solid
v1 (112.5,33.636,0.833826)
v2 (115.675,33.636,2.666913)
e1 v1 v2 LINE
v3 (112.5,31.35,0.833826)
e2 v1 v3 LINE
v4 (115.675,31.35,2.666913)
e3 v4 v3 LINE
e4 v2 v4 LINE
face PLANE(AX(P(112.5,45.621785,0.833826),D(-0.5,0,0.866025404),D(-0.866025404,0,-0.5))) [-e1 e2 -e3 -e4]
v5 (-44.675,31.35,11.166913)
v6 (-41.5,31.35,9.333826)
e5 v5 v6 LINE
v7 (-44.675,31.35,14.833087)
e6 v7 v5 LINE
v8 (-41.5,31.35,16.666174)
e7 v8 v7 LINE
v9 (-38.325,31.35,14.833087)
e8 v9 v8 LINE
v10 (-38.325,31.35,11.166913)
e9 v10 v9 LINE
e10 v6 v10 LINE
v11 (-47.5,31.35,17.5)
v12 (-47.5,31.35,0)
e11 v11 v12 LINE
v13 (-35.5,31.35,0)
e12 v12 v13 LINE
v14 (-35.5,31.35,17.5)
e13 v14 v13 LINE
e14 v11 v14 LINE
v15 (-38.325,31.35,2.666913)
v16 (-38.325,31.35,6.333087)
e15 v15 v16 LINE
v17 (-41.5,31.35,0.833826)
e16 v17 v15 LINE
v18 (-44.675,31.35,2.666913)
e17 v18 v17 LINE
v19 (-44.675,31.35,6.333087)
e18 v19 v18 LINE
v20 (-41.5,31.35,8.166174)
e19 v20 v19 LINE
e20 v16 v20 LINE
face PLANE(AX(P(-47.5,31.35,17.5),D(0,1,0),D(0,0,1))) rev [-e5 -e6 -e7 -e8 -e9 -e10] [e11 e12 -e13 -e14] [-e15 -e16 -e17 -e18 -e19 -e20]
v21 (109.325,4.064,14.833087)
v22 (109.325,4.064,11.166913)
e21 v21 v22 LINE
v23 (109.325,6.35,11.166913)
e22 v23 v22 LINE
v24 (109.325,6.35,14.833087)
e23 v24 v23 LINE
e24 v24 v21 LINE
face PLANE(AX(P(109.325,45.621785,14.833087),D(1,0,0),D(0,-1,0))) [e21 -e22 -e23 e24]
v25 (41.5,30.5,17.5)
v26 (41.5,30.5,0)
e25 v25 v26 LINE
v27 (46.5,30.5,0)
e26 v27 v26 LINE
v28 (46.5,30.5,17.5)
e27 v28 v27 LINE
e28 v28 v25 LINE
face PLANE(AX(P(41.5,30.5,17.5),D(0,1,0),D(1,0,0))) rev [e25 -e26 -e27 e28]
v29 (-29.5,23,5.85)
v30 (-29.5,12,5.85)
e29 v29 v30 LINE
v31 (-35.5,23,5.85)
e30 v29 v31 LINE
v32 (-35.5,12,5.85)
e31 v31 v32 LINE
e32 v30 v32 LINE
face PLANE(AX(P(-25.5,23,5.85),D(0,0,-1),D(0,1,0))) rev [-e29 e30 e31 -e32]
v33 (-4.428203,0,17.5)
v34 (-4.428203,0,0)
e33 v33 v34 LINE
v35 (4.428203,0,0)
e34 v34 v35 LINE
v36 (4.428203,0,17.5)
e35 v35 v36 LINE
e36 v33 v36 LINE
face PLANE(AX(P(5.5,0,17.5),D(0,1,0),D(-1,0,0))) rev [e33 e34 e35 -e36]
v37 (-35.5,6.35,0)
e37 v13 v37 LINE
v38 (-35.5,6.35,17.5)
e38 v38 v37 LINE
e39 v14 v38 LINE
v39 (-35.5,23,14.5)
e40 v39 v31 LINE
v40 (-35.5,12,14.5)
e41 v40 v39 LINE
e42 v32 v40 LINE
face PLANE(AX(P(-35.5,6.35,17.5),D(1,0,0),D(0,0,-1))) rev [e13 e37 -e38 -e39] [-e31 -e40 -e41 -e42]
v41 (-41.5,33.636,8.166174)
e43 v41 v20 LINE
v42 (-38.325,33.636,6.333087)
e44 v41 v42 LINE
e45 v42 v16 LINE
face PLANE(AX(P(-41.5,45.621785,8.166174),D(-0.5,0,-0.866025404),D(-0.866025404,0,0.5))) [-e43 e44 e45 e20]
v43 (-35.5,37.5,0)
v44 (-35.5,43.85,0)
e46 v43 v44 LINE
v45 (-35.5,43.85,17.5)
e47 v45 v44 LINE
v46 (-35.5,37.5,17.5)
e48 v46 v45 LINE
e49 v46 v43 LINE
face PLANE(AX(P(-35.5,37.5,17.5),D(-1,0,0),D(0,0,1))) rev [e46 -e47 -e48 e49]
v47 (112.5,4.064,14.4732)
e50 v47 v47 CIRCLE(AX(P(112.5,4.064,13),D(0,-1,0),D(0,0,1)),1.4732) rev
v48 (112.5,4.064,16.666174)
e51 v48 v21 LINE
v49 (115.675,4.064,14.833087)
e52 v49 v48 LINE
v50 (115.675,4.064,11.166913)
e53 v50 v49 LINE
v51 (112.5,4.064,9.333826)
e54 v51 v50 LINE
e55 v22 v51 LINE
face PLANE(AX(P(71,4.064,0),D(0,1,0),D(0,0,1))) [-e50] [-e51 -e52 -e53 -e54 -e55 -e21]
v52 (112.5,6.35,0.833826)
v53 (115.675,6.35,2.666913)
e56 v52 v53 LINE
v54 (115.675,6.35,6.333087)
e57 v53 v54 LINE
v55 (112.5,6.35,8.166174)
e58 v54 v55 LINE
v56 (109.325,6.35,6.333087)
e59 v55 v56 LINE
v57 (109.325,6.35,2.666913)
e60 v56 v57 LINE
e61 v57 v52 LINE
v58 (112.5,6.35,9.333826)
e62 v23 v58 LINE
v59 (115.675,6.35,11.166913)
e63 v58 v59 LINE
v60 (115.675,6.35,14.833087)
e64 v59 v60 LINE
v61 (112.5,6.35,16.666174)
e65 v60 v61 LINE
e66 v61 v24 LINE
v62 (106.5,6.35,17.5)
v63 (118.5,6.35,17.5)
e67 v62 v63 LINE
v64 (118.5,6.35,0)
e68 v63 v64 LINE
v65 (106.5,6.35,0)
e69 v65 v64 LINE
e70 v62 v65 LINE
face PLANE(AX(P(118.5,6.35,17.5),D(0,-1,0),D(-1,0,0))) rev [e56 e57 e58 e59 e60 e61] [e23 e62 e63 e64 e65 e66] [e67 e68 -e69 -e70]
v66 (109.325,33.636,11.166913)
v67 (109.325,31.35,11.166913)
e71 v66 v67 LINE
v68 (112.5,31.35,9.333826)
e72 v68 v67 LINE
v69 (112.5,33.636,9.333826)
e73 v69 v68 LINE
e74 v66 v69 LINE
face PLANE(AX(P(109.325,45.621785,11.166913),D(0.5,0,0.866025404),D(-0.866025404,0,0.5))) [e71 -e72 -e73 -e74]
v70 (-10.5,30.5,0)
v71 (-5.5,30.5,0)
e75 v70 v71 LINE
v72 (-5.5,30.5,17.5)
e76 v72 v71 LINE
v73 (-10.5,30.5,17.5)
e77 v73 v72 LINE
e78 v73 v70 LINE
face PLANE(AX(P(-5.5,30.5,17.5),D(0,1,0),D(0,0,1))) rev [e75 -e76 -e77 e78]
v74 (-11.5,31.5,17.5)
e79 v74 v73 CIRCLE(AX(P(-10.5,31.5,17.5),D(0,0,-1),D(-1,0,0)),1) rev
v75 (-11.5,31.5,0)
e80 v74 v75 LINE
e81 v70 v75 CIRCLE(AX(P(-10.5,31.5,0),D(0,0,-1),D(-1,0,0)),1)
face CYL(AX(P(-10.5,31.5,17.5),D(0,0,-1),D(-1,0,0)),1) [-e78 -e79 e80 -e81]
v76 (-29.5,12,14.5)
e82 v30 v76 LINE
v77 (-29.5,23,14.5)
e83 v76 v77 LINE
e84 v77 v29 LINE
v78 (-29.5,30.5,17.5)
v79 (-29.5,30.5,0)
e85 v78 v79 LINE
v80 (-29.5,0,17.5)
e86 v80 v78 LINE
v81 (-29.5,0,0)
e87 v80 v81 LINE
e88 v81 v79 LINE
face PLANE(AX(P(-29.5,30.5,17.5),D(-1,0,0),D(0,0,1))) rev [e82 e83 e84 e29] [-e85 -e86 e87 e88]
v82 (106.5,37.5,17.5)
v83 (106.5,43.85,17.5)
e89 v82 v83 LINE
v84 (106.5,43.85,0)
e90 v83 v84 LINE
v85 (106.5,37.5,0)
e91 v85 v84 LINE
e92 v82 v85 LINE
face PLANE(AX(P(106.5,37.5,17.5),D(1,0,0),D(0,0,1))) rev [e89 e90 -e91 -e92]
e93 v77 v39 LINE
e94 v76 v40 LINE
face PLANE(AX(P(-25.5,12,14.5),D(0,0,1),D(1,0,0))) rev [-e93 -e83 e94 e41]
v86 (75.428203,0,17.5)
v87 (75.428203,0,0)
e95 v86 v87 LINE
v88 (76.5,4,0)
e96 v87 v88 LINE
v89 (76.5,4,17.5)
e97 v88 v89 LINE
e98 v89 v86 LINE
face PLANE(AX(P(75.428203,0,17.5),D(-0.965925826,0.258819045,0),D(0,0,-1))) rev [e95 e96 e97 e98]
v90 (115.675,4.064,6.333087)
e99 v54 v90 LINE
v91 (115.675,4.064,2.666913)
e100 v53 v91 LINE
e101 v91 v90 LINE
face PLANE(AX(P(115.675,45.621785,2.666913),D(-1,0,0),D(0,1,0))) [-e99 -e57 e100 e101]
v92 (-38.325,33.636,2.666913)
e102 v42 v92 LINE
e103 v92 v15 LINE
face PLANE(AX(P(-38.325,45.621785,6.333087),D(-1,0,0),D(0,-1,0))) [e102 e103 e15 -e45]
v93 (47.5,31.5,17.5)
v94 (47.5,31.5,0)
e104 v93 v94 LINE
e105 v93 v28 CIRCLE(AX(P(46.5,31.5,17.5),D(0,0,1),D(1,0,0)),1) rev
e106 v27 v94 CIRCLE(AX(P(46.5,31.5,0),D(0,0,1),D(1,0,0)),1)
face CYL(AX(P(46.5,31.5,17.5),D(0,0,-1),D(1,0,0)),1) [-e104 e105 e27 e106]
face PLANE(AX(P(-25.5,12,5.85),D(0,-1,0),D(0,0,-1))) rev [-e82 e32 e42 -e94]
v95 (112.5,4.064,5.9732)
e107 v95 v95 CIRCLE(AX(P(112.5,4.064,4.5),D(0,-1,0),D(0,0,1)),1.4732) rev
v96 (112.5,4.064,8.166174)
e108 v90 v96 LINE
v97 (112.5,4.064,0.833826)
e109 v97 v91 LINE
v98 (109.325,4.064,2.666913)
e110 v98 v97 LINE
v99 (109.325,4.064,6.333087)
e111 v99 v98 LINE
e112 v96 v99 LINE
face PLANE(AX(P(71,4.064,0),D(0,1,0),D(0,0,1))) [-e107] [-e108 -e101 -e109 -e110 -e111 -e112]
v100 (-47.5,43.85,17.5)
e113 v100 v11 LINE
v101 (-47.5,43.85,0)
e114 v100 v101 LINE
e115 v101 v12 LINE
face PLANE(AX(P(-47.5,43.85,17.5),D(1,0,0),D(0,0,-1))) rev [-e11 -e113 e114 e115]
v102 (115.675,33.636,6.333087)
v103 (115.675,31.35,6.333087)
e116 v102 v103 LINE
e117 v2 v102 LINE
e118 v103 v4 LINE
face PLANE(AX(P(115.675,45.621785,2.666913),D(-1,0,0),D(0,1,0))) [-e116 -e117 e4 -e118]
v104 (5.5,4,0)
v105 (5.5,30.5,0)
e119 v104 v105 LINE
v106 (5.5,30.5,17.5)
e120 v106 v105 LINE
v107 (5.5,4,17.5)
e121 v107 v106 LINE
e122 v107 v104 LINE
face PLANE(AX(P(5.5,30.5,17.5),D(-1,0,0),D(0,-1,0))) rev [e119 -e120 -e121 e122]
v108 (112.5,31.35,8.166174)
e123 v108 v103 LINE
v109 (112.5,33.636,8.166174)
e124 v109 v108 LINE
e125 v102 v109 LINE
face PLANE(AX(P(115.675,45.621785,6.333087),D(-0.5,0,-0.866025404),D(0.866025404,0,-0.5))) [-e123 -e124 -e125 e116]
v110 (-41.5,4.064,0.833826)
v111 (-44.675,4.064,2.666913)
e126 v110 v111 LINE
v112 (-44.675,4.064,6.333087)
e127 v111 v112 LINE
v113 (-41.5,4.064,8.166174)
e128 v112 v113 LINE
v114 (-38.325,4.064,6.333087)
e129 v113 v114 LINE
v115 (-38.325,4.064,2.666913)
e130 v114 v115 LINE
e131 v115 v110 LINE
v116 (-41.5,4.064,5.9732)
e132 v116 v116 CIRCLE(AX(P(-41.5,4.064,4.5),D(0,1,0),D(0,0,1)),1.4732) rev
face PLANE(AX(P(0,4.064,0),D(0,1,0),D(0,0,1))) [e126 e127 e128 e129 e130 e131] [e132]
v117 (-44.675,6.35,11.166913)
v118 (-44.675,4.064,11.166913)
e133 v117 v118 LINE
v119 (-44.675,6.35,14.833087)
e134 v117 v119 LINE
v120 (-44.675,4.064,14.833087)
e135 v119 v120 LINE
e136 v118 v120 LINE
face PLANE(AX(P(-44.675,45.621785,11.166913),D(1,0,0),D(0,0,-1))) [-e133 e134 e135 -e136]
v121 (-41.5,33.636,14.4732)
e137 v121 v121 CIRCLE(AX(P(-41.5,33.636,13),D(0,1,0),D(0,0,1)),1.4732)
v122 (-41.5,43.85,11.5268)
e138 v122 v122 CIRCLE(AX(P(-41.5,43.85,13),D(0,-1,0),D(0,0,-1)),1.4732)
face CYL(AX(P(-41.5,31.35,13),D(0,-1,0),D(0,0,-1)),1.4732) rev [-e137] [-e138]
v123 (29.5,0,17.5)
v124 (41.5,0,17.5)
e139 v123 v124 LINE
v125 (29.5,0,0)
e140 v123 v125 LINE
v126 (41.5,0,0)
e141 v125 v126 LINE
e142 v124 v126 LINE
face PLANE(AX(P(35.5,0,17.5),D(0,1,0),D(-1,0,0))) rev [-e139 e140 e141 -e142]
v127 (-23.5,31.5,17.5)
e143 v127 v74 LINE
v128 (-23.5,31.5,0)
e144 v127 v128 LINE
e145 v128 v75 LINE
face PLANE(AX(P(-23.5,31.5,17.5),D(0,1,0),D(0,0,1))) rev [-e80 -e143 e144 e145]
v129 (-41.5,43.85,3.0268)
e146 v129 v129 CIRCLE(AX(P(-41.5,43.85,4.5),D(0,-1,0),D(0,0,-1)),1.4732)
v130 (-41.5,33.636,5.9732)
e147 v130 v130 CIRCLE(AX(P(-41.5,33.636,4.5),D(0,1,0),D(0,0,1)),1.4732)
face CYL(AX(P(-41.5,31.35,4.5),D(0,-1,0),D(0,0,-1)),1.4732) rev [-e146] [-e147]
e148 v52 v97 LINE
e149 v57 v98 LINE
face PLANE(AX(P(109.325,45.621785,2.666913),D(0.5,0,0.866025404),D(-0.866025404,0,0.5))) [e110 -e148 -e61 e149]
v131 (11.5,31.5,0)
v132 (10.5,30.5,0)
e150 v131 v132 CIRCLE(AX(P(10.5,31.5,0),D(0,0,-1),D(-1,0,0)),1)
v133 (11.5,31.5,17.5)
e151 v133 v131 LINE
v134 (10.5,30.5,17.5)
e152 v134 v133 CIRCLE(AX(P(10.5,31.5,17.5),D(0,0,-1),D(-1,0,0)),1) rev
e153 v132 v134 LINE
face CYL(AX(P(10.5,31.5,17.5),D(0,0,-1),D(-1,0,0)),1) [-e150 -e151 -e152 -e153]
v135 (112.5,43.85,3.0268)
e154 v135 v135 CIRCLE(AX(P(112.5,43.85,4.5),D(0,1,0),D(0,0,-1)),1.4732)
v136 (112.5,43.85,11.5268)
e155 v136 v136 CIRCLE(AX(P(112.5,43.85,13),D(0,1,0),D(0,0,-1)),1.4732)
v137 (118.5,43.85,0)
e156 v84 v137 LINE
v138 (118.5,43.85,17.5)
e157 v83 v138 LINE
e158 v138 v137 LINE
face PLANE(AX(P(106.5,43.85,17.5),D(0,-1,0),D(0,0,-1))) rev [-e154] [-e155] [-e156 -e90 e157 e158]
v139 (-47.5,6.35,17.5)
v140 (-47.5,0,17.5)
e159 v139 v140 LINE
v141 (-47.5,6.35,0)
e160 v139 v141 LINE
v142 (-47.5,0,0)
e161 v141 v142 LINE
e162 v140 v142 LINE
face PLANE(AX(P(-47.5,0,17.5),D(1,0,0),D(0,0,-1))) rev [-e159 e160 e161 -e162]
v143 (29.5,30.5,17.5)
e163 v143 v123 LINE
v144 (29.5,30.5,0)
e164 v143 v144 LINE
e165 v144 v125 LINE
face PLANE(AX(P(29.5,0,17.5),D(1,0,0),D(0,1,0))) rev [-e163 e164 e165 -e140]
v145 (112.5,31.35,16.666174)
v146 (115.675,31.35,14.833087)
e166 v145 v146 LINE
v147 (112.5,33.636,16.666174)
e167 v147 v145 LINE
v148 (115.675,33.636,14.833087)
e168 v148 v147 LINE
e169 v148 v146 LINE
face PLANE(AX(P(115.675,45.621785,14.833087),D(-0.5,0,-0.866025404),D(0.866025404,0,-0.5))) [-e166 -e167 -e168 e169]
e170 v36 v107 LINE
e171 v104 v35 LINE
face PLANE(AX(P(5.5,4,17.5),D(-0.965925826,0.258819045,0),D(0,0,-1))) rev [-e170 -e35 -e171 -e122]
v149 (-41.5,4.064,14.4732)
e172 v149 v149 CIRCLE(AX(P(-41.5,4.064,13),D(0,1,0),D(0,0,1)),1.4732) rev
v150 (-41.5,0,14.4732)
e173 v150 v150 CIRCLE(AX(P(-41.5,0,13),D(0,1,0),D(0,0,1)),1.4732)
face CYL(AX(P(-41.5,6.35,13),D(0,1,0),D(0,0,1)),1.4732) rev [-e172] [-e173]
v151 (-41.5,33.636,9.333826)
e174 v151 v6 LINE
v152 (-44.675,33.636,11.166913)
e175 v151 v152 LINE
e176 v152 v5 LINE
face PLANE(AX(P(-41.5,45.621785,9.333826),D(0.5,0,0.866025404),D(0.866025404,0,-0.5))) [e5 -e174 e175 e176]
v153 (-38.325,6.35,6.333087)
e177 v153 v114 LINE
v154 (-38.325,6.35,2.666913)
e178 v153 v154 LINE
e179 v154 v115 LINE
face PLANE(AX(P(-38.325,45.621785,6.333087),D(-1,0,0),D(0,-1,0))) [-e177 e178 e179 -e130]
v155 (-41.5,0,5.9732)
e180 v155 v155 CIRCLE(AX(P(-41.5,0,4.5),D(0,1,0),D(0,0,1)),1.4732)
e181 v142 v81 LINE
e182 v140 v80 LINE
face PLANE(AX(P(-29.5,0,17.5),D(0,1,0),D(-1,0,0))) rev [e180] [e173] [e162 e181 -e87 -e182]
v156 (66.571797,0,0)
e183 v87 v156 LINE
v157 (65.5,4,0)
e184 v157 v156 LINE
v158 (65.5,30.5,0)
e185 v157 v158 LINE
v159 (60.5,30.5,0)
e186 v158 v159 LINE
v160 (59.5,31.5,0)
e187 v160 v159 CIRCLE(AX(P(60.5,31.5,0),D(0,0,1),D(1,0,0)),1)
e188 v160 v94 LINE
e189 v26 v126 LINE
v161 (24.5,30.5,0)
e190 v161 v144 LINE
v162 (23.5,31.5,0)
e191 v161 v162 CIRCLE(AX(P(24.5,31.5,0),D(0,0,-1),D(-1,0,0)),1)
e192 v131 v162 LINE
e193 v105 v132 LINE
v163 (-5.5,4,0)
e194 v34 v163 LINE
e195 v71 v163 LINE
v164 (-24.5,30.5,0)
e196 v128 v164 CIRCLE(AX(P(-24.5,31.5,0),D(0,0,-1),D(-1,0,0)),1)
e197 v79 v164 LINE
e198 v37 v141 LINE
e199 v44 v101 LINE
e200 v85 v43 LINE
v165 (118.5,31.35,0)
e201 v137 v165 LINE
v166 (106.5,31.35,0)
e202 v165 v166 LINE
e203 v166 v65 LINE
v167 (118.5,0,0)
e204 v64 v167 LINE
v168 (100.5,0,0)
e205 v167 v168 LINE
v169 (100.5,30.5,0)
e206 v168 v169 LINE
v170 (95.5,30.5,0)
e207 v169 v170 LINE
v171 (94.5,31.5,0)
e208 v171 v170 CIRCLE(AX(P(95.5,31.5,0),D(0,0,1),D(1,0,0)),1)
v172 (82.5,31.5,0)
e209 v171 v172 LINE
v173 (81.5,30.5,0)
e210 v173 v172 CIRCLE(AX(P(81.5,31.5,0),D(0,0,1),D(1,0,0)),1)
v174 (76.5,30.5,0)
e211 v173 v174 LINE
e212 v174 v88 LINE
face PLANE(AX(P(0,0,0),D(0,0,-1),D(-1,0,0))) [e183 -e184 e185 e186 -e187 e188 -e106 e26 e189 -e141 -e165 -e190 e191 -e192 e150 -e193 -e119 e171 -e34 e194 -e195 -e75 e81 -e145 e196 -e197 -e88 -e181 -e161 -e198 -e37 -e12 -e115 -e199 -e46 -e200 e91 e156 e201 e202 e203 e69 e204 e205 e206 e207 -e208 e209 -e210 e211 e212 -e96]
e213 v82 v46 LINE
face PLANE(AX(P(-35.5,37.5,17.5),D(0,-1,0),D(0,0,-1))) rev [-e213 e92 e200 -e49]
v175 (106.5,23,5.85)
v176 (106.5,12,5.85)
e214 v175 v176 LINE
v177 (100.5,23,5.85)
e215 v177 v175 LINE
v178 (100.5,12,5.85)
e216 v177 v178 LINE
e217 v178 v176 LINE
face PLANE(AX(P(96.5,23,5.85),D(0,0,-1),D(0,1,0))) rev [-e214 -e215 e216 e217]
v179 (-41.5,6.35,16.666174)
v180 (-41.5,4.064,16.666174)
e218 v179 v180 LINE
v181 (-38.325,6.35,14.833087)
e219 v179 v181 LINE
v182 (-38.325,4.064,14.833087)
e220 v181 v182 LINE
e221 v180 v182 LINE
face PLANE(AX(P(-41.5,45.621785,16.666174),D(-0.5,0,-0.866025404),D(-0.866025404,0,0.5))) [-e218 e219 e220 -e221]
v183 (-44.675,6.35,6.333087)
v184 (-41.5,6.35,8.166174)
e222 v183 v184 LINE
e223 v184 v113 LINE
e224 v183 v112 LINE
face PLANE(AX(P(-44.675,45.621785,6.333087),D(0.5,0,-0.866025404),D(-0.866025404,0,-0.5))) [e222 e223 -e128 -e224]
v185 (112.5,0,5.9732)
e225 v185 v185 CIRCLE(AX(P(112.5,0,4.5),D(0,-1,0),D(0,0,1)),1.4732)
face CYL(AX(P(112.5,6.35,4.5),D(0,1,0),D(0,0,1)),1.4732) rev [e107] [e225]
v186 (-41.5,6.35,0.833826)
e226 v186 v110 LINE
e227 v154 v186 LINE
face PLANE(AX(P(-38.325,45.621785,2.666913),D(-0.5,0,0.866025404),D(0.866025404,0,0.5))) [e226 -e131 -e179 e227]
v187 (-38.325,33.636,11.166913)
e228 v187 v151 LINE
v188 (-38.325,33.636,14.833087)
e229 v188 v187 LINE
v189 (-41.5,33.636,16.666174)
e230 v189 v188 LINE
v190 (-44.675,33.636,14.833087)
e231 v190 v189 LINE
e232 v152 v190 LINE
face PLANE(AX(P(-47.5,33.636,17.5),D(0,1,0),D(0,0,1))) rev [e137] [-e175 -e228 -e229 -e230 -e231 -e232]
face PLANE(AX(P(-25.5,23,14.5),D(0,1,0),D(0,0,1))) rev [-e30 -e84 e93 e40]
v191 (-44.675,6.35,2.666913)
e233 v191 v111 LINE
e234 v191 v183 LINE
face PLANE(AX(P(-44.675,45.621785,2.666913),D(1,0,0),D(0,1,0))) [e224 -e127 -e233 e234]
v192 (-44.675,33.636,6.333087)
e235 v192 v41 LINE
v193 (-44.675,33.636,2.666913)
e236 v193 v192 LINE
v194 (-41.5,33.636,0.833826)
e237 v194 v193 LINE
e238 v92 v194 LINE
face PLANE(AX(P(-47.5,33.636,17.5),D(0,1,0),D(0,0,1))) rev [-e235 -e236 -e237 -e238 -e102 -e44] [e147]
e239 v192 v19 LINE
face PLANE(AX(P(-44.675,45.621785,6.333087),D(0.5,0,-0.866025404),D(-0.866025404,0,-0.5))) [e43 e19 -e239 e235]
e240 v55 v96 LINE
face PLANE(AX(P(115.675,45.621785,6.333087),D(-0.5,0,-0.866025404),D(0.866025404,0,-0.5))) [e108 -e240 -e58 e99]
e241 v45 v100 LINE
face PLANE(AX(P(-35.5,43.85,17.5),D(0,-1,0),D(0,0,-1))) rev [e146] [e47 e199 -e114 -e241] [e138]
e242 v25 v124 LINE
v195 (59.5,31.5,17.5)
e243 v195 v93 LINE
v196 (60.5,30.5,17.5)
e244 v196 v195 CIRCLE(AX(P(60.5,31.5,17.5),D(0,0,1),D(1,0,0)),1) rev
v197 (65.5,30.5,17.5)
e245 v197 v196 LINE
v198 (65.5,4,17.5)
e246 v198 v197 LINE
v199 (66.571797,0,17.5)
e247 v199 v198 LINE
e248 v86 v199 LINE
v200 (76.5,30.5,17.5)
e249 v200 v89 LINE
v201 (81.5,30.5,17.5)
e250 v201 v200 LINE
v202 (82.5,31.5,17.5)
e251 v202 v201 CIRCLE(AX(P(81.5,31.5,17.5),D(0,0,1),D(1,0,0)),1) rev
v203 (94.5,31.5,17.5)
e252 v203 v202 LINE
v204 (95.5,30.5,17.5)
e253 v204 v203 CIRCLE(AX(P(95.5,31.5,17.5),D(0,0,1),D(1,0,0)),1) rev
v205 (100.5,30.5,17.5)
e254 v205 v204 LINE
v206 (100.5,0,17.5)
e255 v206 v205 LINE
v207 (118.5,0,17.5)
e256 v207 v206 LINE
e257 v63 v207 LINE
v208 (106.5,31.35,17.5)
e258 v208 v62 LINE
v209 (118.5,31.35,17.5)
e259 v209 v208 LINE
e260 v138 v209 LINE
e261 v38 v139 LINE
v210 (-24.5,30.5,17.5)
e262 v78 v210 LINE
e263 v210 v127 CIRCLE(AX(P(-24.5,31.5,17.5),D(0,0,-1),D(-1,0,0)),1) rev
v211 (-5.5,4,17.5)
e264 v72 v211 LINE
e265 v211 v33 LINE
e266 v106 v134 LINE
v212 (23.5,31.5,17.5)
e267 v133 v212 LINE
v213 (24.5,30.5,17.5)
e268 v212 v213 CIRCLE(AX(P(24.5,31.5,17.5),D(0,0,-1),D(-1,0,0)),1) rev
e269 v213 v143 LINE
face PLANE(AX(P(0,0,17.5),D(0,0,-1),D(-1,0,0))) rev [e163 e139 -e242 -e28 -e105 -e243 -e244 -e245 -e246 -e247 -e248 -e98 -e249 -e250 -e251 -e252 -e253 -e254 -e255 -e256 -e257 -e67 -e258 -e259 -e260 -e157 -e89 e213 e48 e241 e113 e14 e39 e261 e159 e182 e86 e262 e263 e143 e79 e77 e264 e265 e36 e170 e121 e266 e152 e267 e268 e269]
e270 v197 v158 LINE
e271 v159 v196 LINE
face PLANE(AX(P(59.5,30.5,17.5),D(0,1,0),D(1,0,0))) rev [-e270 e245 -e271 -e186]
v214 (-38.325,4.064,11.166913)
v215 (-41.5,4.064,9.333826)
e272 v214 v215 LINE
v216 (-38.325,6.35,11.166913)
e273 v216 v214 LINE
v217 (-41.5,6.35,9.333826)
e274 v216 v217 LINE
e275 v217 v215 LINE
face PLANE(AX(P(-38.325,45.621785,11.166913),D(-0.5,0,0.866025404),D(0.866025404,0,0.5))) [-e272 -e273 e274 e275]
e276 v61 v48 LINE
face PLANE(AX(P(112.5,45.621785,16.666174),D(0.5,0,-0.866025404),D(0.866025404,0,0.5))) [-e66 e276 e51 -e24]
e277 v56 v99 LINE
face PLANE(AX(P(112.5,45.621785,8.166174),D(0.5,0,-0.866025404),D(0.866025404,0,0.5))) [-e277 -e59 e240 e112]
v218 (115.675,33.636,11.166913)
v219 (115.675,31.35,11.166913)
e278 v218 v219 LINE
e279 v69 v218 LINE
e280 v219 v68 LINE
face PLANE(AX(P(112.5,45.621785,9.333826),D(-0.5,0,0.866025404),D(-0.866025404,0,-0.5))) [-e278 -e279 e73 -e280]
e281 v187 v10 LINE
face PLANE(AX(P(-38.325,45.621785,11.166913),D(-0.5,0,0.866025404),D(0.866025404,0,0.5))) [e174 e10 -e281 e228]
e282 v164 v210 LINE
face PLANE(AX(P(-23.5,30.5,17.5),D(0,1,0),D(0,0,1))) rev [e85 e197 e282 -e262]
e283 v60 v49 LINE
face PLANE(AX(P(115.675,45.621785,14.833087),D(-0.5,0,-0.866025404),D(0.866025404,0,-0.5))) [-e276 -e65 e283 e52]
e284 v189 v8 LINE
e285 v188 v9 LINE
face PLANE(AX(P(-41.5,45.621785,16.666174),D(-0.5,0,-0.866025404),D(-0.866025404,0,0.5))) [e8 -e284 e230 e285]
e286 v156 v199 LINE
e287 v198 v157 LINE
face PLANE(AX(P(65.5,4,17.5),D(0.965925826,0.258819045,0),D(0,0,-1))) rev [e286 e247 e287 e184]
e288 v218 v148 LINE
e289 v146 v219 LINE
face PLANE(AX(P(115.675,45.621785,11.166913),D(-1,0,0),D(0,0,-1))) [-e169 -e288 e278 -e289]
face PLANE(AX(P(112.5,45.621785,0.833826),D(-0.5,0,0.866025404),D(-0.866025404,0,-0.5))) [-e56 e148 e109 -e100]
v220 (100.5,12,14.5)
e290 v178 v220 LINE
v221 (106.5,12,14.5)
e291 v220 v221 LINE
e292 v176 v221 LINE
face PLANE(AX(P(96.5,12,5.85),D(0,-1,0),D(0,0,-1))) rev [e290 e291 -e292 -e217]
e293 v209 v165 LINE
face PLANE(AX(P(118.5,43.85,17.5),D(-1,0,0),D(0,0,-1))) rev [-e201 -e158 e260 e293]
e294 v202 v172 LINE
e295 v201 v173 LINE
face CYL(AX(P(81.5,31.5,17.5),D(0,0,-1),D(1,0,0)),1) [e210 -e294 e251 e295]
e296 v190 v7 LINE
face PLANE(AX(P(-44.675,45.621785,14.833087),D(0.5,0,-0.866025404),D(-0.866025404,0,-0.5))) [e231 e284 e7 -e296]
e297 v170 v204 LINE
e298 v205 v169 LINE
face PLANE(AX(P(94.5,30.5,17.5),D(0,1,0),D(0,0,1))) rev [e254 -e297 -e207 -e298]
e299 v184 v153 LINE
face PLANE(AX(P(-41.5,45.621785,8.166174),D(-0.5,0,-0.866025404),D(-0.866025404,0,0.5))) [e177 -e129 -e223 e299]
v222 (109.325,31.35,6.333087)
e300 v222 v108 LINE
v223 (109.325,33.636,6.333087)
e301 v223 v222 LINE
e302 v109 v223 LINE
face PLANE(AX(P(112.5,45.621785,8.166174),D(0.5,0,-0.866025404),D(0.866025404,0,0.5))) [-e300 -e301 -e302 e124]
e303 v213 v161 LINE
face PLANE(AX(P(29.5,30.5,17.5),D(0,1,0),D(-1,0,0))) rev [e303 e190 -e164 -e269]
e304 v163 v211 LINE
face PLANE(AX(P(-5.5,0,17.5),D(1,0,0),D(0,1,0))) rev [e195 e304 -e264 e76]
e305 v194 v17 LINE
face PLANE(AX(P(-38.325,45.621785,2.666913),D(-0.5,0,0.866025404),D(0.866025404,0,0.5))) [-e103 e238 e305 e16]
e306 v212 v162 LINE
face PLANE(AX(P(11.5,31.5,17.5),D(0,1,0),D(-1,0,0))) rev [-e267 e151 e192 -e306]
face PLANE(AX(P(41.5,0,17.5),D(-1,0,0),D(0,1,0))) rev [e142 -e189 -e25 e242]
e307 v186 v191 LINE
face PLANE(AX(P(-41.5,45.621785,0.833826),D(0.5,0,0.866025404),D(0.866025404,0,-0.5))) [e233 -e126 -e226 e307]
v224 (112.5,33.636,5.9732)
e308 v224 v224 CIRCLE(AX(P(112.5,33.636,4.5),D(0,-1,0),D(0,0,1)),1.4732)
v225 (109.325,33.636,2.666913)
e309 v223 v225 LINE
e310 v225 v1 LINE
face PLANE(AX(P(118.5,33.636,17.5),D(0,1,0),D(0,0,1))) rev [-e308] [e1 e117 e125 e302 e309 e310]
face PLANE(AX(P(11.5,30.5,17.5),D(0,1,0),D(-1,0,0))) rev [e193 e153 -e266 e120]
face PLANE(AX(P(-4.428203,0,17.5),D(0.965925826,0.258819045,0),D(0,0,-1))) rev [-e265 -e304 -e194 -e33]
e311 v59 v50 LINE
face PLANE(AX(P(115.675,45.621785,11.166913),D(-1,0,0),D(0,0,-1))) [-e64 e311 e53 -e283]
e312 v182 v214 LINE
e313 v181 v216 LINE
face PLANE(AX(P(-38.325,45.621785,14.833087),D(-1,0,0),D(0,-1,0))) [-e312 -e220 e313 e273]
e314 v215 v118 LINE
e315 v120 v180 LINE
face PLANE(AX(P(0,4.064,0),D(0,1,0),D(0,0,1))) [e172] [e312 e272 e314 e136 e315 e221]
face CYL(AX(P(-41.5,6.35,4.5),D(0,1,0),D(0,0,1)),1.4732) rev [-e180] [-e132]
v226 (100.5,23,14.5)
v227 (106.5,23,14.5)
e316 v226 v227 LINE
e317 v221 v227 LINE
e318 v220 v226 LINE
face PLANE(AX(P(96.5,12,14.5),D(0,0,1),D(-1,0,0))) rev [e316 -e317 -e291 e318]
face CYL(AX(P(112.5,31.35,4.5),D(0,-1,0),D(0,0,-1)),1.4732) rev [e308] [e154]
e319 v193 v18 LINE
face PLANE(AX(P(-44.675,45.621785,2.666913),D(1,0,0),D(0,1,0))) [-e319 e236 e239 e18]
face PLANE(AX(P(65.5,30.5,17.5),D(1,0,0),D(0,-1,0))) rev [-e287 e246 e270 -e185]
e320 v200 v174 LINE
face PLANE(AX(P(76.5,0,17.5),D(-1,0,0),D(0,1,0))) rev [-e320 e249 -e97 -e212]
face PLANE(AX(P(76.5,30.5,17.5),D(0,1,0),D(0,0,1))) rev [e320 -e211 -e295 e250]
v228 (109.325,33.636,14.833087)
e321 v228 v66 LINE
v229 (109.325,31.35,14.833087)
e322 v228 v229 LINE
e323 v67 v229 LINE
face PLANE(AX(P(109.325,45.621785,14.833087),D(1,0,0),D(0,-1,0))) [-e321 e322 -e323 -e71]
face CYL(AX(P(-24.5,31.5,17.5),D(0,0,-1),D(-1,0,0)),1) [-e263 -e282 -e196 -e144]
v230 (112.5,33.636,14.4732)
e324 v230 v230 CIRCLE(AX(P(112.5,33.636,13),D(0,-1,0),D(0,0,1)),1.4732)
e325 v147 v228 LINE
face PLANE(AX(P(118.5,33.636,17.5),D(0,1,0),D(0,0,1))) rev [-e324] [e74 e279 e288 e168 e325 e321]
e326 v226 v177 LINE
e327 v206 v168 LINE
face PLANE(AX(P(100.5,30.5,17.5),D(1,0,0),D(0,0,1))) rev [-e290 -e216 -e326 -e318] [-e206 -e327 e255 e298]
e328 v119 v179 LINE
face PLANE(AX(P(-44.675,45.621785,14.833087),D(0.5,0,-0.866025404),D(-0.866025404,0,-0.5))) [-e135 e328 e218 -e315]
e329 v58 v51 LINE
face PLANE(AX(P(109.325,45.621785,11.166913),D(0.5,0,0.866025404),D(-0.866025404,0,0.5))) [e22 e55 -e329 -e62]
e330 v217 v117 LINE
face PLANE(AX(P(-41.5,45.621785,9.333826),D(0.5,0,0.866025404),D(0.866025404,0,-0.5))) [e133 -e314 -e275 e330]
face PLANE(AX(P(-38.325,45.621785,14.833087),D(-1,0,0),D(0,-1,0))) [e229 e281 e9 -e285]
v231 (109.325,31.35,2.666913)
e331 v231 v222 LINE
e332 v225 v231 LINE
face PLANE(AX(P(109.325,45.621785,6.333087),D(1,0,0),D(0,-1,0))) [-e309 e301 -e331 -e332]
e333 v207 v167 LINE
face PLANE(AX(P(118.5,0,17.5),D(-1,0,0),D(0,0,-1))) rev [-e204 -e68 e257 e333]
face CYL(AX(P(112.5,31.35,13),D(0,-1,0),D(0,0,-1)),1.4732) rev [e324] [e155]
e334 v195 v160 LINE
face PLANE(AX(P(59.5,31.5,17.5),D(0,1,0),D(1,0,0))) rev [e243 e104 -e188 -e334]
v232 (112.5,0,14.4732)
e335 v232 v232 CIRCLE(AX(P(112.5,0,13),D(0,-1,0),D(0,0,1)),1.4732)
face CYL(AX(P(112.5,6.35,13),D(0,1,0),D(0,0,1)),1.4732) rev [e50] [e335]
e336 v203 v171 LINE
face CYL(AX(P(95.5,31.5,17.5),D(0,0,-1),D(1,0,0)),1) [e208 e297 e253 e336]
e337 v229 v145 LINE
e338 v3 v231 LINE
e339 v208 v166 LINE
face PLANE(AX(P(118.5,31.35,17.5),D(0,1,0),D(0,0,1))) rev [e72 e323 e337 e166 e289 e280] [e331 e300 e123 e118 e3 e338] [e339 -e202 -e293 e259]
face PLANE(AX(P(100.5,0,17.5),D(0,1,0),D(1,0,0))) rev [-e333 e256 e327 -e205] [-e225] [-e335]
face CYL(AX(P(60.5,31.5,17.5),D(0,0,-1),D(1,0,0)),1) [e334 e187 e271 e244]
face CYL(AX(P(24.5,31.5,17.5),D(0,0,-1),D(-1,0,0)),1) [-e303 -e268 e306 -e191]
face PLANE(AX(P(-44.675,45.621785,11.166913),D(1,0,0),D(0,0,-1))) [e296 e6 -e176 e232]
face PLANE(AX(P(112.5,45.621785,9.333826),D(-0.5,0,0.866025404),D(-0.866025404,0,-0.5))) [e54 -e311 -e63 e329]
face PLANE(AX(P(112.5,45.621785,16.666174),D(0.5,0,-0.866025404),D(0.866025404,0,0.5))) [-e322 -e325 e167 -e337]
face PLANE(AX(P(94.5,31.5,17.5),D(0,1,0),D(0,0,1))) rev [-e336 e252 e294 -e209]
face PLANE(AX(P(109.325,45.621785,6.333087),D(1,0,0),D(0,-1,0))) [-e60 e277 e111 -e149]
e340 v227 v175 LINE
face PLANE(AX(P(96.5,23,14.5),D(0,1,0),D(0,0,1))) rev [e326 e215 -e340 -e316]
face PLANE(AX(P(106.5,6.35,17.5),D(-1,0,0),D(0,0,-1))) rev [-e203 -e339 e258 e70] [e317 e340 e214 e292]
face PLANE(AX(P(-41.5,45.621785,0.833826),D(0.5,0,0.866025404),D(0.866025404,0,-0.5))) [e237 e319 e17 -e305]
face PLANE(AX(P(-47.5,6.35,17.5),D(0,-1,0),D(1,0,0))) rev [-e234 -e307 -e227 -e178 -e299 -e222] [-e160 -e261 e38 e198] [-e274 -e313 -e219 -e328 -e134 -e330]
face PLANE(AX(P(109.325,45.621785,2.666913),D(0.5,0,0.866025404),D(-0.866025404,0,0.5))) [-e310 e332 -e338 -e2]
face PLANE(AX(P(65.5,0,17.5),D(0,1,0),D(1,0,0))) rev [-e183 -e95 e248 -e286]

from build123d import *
from OCP.BRepFilletAPI import BRepFilletAPI_MakeChamfer

# Parameters (mm, degrees)
BOSS_EXTRUDE1_DEPTH       = 17.5
FILLET1_R                 = 1
CHAMFER1_SIZE             = 4
CHAMFER1_SIZE2            = 1.07179677
F_4_CLEARANCE_HOLE1_D     = 2.9464
F_4_CLEARANCE_HOLE1_DEPTH = 6.35
CUT_EXTRUDE3_START        = -2.286
CUT_EXTRUDE3_DEPTH        = 29.572
SKETCH8_W                 = 8.65
SKETCH8_H                 = 11
CUT_EXTRUDE2_DEPTH        = 10
F_4_CLEARANCE_HOLE2_D     = 2.9464


with BuildPart() as part:
    # Sketch1 → Boss-Extrude1 (new body)
    with BuildSketch(Plane.XY):
        Polygon((-47.5, 6.35), (-35.5, 6.35), (-35.5, 31.35), (-47.5, 31.35), (-47.5, 43.85), (-35.5, 43.85), (-35.5, 37.5), (35.5, 37.5), (35.5, 0), (29.5, 0), (29.5, 30.5), (23.5, 30.5), (23.5, 31.5), (11.5, 31.5), (11.5, 30.5), (5.5, 30.5), (5.5, 0), (-5.5, 0), (-5.5, 30.5), (-11.5, 30.5), (-11.5, 31.5), (-23.5, 31.5), (-23.5, 30.5), (-29.5, 30.5), (-29.5, 0), (-47.5, 0), align=None)
    extrude(amount=BOSS_EXTRUDE1_DEPTH)

    # Fillet1
    fillet1_edges = [part.edges().sort_by_distance(p)[0] for p in [
        (-11.5, 30.5, 8.75),
        (-23.5, 30.5, 8.75),
        (23.5, 30.5, 8.75),
        (11.5, 30.5, 8.75),
    ]]
    fillet(fillet1_edges, radius=FILLET1_R - 0.0001)  # a hair under: the kernel refuses the full size

    # Chamfer1: one chamfer whose edges measure the first distance from different faces: ONE call of the kernel's chamfer builder (chamfer() names one face for all edges)
    chamfer1_edges_1 = [part.edges().sort_by_distance(p)[0] for p in [
        (5.5, 0, 8.75),
    ]]
    chamfer1_side_1 = [part.faces().sort_by_distance(p)[0] for p in [
        (5.5, 15.25, 8.75),
    ]]
    chamfer1_edges_2 = [part.edges().sort_by_distance(p)[0] for p in [
        (-5.5, 0, 8.75),
    ]]
    chamfer1_side_2 = [part.faces().sort_by_distance(p)[0] for p in [
        (-5.5, 15.25, 8.75),
    ]]
    chamfer1 = BRepFilletAPI_MakeChamfer(part.part.solid().wrapped)
    for e in chamfer1_edges_1:
        chamfer1.Add(CHAMFER1_SIZE, CHAMFER1_SIZE2, e.wrapped, chamfer1_side_1[0].wrapped)  # the first distance lies on this face
    for e in chamfer1_edges_2:
        chamfer1.Add(CHAMFER1_SIZE, CHAMFER1_SIZE2, e.wrapped, chamfer1_side_2[0].wrapped)  # the first distance lies on this face
    add(Compound.cast(chamfer1.Shape()), mode=Mode.REPLACE)

    # #4 Clearance Hole1
    with Locations(Plane(origin=(0, 6.35, 0), x_dir=(1, 0, 0), z_dir=(0, 1, 0))):
        with Locations((-41.5, -4.5), (-41.5, -13)):
            Hole(F_4_CLEARANCE_HOLE1_D / 2, depth=F_4_CLEARANCE_HOLE1_DEPTH)

    # Sketch9 → Cut-Extrude3 (cut)
    with BuildSketch(Plane(origin=(0, 6.35, 0), x_dir=(1, 0, 0), z_dir=(0, 1, 0)).offset(CUT_EXTRUDE3_START)):
        Polygon((-41.5, -9.333825791), (-44.675, -11.166912895), (-44.675, -14.833087105), (-41.5, -16.666174209), (-38.325, -14.833087105), (-38.325, -11.166912895), align=None)
        Polygon((-38.325, -6.333087105), (-38.325, -2.666912895), (-41.5, -0.833825791), (-44.675, -2.666912895), (-44.675, -6.333087105), (-41.5, -8.166174209), align=None)
    extrude(amount=CUT_EXTRUDE3_DEPTH, mode=Mode.SUBTRACT)

    # Sketch8 → Cut-Extrude2 (cut)
    with BuildSketch(Plane.ZY.offset(35.5)):
        with Locations((10.175, 17.5)):
            Rectangle(SKETCH8_W, SKETCH8_H)
    extrude(amount=-CUT_EXTRUDE2_DEPTH, mode=Mode.SUBTRACT)

    # #4 Clearance Hole2 (through all)
    with Locations(Plane(origin=(0, 31.35, 0), x_dir=(-1, 0, 0), z_dir=(0, -1, 0))):
        with Locations((41.5, -13), (41.5, -4.5)):
            Hole(F_4_CLEARANCE_HOLE2_D / 2)

    # Mirror1: part across plane


with BuildPart() as part_1:
    add(part.part)
    add(part.part.mirror(Plane(origin=(35.5, 37.5, 17.5), x_dir=(0, 0, 1), z_dir=(-1, 0, 0))))


solid = part_1.part
